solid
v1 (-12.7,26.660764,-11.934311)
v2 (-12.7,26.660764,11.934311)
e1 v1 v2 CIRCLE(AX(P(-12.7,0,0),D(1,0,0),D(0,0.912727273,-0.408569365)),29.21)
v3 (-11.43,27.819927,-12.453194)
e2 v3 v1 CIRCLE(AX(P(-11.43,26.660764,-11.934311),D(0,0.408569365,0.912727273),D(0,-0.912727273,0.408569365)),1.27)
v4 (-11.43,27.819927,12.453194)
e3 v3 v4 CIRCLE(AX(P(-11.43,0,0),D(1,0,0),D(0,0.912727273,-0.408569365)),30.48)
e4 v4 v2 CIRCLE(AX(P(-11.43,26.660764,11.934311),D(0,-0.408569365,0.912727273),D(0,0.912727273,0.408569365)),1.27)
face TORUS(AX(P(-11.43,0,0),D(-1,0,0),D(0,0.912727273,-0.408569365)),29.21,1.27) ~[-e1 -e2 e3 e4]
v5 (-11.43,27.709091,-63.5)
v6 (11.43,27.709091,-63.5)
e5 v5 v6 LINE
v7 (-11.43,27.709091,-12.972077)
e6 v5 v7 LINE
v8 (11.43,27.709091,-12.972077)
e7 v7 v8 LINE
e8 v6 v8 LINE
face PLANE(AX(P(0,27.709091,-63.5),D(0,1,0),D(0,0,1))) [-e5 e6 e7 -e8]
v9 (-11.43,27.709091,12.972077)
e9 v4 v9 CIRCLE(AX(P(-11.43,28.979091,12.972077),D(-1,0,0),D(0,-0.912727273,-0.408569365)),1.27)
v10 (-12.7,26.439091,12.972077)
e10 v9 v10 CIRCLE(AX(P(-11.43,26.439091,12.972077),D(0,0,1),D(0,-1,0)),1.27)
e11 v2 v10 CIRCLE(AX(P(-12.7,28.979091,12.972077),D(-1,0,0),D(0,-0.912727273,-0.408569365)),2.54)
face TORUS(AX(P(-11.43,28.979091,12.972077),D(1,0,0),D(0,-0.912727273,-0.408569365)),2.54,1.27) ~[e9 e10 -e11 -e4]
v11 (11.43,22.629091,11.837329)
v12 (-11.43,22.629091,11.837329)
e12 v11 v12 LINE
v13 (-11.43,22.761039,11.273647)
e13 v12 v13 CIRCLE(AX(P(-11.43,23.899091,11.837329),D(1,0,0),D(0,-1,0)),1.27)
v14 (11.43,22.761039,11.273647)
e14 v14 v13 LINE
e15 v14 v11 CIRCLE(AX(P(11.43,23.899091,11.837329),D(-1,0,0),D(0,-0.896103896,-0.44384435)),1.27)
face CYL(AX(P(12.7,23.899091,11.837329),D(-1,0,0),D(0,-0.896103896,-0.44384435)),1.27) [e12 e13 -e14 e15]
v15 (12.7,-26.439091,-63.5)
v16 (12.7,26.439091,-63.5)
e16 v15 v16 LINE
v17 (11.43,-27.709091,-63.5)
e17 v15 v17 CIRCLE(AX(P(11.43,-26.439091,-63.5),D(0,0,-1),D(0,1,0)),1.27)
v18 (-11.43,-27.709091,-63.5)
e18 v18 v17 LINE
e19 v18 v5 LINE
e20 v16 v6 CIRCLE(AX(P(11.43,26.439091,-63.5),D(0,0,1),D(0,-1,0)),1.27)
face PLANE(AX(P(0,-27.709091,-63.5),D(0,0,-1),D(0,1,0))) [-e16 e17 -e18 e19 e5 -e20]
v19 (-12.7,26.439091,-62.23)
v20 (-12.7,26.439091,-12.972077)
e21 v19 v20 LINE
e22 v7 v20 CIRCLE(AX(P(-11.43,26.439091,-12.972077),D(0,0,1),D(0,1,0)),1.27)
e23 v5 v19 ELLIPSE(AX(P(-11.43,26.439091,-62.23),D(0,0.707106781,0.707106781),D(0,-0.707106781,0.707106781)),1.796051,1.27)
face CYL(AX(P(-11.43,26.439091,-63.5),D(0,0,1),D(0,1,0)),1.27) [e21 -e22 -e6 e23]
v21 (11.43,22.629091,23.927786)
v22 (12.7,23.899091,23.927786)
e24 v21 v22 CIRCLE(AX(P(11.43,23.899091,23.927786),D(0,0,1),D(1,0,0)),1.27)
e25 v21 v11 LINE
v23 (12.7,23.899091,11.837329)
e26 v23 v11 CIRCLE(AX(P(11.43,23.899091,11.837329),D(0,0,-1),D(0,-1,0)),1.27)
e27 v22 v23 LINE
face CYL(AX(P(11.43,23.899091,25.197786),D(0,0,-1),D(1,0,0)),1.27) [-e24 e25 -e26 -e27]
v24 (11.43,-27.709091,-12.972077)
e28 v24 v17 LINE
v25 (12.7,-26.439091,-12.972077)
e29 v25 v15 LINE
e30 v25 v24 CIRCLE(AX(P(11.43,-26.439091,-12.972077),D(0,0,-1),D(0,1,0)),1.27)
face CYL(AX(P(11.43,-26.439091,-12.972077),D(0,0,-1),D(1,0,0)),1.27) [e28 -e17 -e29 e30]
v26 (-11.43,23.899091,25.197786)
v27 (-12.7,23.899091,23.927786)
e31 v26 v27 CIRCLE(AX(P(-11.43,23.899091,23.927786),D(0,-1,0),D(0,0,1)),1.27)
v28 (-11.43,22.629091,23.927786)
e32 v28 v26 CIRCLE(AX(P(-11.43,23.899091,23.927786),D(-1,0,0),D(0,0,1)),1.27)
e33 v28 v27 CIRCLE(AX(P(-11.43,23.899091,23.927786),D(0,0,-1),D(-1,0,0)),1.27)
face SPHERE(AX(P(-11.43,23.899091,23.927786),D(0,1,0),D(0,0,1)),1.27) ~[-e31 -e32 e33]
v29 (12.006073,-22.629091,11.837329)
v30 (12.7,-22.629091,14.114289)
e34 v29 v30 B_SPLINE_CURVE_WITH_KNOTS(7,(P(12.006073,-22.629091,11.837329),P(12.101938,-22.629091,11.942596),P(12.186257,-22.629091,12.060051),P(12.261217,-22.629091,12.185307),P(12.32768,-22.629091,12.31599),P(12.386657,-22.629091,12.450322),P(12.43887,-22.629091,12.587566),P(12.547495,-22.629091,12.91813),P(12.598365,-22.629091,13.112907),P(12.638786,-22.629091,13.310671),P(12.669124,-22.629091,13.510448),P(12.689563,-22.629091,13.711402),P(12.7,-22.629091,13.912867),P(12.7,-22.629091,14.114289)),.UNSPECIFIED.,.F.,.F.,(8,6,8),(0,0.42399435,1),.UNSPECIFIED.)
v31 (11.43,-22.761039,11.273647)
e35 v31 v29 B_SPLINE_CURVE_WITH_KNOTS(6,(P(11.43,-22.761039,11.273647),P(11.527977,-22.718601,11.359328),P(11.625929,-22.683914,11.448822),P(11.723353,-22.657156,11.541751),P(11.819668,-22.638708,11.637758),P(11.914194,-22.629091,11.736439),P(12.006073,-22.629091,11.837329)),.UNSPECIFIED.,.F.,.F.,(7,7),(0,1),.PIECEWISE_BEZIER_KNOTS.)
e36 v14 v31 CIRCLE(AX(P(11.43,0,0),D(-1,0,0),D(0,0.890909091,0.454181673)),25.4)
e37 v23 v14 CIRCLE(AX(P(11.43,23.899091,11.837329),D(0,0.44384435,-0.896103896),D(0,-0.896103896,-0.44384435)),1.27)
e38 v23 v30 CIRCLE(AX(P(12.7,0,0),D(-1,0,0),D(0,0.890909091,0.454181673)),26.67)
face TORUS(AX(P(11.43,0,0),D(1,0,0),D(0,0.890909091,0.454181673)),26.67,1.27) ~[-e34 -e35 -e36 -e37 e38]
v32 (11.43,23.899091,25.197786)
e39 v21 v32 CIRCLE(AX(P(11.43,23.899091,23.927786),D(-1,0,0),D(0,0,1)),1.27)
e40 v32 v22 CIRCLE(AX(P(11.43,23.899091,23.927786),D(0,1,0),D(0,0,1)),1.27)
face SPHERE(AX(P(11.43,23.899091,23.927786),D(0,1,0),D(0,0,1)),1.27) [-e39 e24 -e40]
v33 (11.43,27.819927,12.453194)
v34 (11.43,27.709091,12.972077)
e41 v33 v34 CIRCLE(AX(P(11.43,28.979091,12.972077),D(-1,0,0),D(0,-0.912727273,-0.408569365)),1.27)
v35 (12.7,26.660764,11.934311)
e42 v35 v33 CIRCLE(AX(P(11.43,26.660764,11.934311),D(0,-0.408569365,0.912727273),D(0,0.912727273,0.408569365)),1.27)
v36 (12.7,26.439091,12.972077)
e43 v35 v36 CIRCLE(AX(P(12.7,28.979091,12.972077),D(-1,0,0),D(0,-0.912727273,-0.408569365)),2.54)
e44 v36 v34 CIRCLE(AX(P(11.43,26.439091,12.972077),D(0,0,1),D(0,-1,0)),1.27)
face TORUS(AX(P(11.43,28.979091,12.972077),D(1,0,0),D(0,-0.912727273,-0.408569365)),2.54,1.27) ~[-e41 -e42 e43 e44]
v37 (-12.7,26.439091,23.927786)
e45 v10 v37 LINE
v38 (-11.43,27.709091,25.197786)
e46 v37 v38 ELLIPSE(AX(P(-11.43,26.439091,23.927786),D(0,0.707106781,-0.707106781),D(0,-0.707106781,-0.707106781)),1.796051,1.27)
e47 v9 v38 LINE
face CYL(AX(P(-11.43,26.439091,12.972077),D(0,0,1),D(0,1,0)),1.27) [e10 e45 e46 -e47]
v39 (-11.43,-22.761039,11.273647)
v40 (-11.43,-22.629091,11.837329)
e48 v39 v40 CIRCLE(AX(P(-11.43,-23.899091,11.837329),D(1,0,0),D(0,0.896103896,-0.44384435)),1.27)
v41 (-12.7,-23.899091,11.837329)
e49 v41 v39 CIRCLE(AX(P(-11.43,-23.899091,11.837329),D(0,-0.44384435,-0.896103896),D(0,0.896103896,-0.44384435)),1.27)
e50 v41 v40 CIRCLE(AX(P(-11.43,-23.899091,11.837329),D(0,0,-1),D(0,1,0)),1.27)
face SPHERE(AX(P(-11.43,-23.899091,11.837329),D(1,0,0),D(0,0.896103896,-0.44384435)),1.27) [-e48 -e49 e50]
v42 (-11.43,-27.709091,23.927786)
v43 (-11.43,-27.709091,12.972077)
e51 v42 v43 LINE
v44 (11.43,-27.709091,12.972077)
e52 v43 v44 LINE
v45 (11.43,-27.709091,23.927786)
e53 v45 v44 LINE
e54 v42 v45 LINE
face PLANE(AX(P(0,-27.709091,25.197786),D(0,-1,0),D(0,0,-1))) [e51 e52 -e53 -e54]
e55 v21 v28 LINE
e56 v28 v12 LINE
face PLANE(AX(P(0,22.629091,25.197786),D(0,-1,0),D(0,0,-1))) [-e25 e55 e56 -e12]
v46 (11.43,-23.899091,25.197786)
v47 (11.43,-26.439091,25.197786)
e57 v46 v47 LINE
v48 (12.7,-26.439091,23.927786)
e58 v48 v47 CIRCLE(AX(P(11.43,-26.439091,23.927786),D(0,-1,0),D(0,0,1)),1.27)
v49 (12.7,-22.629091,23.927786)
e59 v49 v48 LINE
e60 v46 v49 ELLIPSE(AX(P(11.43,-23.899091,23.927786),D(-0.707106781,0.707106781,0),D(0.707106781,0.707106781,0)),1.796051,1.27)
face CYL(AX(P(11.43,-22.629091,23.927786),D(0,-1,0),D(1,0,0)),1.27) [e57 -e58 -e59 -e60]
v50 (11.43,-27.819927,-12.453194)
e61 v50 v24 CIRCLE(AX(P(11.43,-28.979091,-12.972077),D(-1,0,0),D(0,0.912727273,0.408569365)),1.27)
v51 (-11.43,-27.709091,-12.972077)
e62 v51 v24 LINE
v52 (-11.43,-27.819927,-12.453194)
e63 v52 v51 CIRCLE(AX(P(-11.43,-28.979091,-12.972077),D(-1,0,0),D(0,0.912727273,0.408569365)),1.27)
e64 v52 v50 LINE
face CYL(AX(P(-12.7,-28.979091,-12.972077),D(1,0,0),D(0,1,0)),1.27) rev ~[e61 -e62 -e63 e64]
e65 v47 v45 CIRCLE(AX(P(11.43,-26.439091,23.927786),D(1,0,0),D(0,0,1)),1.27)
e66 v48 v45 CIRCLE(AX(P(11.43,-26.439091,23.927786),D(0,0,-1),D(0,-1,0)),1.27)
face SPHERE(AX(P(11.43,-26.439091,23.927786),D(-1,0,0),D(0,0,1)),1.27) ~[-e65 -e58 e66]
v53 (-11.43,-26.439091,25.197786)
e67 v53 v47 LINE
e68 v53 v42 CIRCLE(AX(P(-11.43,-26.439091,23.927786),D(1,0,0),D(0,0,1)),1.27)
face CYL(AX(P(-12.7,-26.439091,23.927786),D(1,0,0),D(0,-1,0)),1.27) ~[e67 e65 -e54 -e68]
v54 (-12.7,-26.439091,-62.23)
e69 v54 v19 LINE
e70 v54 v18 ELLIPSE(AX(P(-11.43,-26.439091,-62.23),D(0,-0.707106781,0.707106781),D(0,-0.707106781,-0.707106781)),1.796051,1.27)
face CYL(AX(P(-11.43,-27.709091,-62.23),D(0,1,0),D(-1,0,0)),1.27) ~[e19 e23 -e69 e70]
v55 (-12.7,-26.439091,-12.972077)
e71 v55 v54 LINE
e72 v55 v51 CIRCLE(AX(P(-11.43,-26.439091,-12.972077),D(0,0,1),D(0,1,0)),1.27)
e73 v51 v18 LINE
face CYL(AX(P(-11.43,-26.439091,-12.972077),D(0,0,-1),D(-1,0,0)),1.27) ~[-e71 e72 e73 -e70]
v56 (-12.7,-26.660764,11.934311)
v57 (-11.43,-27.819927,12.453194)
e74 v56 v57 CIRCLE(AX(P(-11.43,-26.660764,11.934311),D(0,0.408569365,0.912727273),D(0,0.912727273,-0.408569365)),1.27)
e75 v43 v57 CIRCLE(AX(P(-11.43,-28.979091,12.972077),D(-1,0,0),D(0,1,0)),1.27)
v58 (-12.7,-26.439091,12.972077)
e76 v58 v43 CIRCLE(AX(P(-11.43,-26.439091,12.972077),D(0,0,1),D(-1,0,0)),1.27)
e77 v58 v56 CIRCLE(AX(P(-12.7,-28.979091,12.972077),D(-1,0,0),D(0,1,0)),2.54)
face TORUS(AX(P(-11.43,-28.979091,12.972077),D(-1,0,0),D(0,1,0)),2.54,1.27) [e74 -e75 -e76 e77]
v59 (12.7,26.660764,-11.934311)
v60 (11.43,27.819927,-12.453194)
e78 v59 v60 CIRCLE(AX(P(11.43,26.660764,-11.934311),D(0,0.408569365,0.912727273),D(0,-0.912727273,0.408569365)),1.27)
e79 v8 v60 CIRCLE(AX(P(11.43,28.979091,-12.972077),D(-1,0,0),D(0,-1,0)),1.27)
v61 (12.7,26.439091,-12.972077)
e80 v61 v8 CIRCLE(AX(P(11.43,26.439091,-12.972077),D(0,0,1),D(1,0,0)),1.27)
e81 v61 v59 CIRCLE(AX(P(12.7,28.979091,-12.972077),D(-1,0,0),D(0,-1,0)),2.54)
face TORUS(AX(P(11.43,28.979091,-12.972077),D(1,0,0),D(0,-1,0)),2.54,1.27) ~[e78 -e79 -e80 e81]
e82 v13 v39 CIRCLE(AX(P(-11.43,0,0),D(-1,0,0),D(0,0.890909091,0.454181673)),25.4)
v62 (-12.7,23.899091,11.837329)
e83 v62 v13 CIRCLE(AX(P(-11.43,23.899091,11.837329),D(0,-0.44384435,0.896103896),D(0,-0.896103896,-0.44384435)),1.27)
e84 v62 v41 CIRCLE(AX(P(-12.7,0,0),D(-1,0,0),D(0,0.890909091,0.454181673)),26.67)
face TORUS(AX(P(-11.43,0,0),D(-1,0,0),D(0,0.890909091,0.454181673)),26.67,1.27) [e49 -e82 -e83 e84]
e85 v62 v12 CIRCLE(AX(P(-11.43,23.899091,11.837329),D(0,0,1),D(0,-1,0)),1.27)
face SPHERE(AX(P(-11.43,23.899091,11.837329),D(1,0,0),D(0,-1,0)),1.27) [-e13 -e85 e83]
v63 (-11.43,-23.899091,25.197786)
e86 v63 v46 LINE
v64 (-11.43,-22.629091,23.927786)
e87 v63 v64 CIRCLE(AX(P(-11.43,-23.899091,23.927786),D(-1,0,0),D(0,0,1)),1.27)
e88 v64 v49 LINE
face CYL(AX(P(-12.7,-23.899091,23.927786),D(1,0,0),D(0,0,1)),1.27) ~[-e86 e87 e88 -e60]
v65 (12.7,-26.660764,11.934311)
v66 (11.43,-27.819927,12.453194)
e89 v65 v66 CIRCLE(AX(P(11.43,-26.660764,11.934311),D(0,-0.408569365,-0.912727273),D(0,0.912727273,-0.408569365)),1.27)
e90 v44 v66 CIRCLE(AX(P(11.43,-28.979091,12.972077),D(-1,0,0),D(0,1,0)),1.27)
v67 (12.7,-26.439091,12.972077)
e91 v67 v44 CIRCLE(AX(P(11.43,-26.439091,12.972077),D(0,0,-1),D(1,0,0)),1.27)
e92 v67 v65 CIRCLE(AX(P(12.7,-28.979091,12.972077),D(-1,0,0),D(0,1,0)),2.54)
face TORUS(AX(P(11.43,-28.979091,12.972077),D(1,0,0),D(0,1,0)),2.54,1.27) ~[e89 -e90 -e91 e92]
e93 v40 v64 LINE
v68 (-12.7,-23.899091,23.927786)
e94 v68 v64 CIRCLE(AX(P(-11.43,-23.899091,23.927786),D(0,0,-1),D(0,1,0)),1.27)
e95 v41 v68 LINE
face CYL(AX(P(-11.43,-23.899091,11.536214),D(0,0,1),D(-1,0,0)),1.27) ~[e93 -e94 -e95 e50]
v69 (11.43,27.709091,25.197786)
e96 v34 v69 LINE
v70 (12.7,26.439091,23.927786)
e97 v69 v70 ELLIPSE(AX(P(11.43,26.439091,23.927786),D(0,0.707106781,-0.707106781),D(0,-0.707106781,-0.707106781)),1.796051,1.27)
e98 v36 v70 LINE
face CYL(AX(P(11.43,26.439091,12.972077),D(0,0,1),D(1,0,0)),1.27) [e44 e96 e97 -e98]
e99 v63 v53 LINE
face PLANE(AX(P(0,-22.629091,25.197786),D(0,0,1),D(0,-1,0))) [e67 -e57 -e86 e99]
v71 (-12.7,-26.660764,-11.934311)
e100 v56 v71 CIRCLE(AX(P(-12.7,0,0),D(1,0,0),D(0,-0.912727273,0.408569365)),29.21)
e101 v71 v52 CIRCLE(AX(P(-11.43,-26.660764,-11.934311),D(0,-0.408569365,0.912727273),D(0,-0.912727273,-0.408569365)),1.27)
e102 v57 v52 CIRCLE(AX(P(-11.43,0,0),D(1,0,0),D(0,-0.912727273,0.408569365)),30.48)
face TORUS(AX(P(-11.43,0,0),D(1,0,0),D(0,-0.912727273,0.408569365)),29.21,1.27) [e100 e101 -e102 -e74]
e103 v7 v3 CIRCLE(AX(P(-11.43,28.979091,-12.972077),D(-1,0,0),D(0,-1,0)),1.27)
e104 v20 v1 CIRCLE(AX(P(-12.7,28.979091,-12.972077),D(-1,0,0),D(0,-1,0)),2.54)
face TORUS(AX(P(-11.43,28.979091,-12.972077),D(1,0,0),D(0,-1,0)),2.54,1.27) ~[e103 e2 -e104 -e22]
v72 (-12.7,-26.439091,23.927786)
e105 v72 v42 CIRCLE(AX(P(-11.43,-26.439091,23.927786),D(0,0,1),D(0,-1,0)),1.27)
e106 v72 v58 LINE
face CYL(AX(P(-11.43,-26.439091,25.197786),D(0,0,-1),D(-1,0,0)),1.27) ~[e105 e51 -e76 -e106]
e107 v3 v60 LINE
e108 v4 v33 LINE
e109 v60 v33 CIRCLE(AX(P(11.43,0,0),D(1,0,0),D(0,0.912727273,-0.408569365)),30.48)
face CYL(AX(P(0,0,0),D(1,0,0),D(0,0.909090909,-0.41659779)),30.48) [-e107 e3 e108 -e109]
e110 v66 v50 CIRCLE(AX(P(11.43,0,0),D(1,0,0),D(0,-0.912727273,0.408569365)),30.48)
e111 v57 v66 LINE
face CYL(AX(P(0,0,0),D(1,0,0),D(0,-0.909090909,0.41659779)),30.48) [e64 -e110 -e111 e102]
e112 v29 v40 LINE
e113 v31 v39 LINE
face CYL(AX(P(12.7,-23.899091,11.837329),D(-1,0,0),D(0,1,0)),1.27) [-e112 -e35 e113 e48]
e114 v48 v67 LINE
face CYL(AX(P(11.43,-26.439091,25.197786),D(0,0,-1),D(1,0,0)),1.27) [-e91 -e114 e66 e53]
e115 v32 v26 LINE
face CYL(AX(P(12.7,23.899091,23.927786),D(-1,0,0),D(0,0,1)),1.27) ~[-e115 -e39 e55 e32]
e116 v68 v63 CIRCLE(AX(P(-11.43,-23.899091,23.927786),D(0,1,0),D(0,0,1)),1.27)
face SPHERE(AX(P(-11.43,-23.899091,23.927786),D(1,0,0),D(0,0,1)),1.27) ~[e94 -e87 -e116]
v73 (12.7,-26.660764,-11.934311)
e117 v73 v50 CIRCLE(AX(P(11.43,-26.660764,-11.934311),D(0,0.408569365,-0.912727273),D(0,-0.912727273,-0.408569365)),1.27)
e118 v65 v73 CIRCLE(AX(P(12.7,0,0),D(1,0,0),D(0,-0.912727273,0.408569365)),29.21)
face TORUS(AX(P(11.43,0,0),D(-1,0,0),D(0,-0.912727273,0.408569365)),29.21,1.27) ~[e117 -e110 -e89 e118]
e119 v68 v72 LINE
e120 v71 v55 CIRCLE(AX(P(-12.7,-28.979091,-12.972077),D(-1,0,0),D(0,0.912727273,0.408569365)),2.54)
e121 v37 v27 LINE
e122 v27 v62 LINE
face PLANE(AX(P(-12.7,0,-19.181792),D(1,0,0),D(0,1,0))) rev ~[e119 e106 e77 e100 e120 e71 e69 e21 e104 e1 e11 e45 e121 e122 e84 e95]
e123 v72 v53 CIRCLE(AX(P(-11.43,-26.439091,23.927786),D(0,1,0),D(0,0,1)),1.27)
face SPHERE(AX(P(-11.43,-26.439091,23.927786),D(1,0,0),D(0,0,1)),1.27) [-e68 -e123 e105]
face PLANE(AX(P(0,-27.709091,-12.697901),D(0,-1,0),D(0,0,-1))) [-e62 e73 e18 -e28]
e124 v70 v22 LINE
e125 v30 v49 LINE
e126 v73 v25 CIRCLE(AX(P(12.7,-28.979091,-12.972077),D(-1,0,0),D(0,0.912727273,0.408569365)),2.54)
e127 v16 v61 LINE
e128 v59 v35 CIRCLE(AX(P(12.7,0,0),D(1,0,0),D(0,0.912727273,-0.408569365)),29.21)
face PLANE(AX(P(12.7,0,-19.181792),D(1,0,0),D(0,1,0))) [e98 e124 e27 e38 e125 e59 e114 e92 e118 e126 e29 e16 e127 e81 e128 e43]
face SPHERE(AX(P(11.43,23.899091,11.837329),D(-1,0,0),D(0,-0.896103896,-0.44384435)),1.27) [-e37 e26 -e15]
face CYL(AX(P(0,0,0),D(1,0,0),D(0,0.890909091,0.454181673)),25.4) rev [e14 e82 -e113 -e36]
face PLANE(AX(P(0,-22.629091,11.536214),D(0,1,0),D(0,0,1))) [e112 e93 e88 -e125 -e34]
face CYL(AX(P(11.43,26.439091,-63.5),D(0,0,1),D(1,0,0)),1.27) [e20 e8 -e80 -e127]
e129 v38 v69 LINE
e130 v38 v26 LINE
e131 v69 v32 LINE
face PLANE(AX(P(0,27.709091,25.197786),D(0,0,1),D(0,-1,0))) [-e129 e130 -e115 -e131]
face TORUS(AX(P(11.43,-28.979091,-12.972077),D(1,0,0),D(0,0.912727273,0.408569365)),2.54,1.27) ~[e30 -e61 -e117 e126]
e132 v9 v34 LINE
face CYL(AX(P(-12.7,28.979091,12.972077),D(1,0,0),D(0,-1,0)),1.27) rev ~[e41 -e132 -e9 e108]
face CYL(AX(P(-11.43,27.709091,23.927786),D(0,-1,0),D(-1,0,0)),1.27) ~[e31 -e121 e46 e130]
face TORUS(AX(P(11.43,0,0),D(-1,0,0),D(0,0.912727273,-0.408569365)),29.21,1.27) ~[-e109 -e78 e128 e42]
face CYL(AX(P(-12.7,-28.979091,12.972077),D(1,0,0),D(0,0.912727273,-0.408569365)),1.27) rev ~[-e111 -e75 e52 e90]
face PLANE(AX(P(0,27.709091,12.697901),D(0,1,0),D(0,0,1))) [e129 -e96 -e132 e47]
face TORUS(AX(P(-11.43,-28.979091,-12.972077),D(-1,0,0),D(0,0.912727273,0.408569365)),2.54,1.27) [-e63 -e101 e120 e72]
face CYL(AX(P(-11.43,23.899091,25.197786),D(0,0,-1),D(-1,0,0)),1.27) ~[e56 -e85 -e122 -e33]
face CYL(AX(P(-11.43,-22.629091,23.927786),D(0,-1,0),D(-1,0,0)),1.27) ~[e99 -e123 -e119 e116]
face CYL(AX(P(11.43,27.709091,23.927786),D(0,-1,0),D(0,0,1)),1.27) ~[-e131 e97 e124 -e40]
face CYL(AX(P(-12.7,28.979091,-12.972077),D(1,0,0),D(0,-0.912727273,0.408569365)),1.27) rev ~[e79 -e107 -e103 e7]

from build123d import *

# Parameters (mm, degrees)
F1_DEPTH = 12.7
F2_F1_R  = 1.27
F2_F2_R  = 1.27


with BuildPart() as f1:
    # F0 (on Right) → F1 (new body, symmetric)
    with BuildSketch(Plane.YZ):
        with BuildLine():
            ThreePointArc((-22.86, -11.0716033166), (-25.3986752482, 0.259414025), (-22.6290909091, 11.5362144843))
            Line((-22.6290909091, 11.5362144843), (-22.6290909091, 25.197786356))
            Line((-22.6290909091, 25.197786356), (-27.7090909091, 25.197786356))
            Line((-27.7090909091, 25.197786356), (-27.7090909091, 12.6979006529))
            ThreePointArc((-27.7090909091, 12.6979006529), (-30.48, 0), (-27.7090909091, -12.6979006529))
            Line((-27.7090909091, -12.6979006529), (-27.7090909091, -63.5))
            Line((-27.7090909091, -63.5), (-22.86, -63.5))
            Line((-22.86, -63.5), (22.86, -63.5))
            Line((22.86, -63.5), (27.7090909091, -63.5))
            Line((27.7090909091, -63.5), (27.7090909091, -12.6979006529))
            ThreePointArc((27.7090909091, -12.6979006529), (30.48, 0), (27.7090909091, 12.6979006529))
            Line((27.7090909091, 12.6979006529), (27.7090909091, 25.197786356))
            Line((27.7090909091, 25.197786356), (22.6290909091, 25.197786356))
            Line((22.6290909091, 25.197786356), (22.6290909091, 11.5362144843))
            ThreePointArc((22.6290909091, 11.5362144843), (25.3986752482, 0.259414025), (22.86, -11.0716033166))
            ThreePointArc((22.86, -11.0716033166), (0, -25.4), (-22.86, -11.0716033166))
        make_face()
    extrude(amount=F1_DEPTH, both=True)

    # F2: fillet of radius 1.27 on 31 edges, made by hand

    # F2_f1
    f2_f1_edges = [f1.edges().sort_by_distance(p)[0] for p in [
        (0, 27.7090909091, 12.6979006529),
        (0, 27.7090909091, -12.6979006529),
        (0, -27.7090909091, 12.6979006529),
        (0, -27.7090909091, -12.6979006529),
    ]]
    fillet(f2_f1_edges, radius=F2_F1_R)

    # F2_f2
    f2_f2_edges = [f1.edges().sort_by_distance(p)[0] for p in [
        (0, -22.6290909091, 25.197786356),
        (0, -27.7090909091, 25.197786356),
        (-12.7, -25.1690909091, 25.197786356),
        (12.7, -25.1690909091, 25.197786356),
        (12.7, 25.1690909091, 25.197786356),
        (-12.7, 25.1690909091, 25.197786356),
        (0, 22.6290909091, 25.197786356),
        (-6.35, -22.6290909091, 11.5362144843),
        (6.35, -22.6290909091, 11.5362144843),
        (-6.35, 22.6290909091, 11.5362144843),
        (6.35, 22.6290909091, 11.5362144843),
        (-12.7, -27.7090909091, -38.2360386617),
        (-12.7, 27.7090909091, 19.0849318397),
        (-12.7, 22.6290909091, 18.3670004202),
        (-12.7, 25.3986752482, 0.259414025),
        (-12.7, 0, -25.4),
        (-12.7, -25.3986752482, 0.259414025),
        (-12.7, -22.6290909091, 18.3670004202),
        (-12.7, -27.7090909091, 19.0849318397),
        (-12.7, -30.48, 0),
        (-12.7, 0, -63.5),
        (-12.7, 27.7090909091, -38.2360386617),
        (-12.7, 30.48, 0),
        (12.7, -30.48, 0),
        (12.7, 0, -25.4),
        (12.7, 30.48, 0),
        (12.7, 22.6290909091, 18.3670004202),
        (12.7, 25.3986752482, 0.259414025),
        (12.7, -25.3986752482, 0.259414025),
        (12.7, 27.7371090618, -12.7067829757),
        (12.7, 27.7371090618, 12.7067829757),
        (12.7, -27.7371090618, 12.7067829757),
        (12.7, -27.7371090618, -12.7067829757),
        (-12.7, 27.7371090618, -12.7067829757),
        (-12.7, 27.7371090618, 12.7067829757),
        (-12.7, -27.7371090618, 12.7067829757),
        (-12.7, -27.7371090618, -12.7067829757),
    ]]
    fillet(f2_f2_edges, radius=F2_F2_R)


solid = f1.part
